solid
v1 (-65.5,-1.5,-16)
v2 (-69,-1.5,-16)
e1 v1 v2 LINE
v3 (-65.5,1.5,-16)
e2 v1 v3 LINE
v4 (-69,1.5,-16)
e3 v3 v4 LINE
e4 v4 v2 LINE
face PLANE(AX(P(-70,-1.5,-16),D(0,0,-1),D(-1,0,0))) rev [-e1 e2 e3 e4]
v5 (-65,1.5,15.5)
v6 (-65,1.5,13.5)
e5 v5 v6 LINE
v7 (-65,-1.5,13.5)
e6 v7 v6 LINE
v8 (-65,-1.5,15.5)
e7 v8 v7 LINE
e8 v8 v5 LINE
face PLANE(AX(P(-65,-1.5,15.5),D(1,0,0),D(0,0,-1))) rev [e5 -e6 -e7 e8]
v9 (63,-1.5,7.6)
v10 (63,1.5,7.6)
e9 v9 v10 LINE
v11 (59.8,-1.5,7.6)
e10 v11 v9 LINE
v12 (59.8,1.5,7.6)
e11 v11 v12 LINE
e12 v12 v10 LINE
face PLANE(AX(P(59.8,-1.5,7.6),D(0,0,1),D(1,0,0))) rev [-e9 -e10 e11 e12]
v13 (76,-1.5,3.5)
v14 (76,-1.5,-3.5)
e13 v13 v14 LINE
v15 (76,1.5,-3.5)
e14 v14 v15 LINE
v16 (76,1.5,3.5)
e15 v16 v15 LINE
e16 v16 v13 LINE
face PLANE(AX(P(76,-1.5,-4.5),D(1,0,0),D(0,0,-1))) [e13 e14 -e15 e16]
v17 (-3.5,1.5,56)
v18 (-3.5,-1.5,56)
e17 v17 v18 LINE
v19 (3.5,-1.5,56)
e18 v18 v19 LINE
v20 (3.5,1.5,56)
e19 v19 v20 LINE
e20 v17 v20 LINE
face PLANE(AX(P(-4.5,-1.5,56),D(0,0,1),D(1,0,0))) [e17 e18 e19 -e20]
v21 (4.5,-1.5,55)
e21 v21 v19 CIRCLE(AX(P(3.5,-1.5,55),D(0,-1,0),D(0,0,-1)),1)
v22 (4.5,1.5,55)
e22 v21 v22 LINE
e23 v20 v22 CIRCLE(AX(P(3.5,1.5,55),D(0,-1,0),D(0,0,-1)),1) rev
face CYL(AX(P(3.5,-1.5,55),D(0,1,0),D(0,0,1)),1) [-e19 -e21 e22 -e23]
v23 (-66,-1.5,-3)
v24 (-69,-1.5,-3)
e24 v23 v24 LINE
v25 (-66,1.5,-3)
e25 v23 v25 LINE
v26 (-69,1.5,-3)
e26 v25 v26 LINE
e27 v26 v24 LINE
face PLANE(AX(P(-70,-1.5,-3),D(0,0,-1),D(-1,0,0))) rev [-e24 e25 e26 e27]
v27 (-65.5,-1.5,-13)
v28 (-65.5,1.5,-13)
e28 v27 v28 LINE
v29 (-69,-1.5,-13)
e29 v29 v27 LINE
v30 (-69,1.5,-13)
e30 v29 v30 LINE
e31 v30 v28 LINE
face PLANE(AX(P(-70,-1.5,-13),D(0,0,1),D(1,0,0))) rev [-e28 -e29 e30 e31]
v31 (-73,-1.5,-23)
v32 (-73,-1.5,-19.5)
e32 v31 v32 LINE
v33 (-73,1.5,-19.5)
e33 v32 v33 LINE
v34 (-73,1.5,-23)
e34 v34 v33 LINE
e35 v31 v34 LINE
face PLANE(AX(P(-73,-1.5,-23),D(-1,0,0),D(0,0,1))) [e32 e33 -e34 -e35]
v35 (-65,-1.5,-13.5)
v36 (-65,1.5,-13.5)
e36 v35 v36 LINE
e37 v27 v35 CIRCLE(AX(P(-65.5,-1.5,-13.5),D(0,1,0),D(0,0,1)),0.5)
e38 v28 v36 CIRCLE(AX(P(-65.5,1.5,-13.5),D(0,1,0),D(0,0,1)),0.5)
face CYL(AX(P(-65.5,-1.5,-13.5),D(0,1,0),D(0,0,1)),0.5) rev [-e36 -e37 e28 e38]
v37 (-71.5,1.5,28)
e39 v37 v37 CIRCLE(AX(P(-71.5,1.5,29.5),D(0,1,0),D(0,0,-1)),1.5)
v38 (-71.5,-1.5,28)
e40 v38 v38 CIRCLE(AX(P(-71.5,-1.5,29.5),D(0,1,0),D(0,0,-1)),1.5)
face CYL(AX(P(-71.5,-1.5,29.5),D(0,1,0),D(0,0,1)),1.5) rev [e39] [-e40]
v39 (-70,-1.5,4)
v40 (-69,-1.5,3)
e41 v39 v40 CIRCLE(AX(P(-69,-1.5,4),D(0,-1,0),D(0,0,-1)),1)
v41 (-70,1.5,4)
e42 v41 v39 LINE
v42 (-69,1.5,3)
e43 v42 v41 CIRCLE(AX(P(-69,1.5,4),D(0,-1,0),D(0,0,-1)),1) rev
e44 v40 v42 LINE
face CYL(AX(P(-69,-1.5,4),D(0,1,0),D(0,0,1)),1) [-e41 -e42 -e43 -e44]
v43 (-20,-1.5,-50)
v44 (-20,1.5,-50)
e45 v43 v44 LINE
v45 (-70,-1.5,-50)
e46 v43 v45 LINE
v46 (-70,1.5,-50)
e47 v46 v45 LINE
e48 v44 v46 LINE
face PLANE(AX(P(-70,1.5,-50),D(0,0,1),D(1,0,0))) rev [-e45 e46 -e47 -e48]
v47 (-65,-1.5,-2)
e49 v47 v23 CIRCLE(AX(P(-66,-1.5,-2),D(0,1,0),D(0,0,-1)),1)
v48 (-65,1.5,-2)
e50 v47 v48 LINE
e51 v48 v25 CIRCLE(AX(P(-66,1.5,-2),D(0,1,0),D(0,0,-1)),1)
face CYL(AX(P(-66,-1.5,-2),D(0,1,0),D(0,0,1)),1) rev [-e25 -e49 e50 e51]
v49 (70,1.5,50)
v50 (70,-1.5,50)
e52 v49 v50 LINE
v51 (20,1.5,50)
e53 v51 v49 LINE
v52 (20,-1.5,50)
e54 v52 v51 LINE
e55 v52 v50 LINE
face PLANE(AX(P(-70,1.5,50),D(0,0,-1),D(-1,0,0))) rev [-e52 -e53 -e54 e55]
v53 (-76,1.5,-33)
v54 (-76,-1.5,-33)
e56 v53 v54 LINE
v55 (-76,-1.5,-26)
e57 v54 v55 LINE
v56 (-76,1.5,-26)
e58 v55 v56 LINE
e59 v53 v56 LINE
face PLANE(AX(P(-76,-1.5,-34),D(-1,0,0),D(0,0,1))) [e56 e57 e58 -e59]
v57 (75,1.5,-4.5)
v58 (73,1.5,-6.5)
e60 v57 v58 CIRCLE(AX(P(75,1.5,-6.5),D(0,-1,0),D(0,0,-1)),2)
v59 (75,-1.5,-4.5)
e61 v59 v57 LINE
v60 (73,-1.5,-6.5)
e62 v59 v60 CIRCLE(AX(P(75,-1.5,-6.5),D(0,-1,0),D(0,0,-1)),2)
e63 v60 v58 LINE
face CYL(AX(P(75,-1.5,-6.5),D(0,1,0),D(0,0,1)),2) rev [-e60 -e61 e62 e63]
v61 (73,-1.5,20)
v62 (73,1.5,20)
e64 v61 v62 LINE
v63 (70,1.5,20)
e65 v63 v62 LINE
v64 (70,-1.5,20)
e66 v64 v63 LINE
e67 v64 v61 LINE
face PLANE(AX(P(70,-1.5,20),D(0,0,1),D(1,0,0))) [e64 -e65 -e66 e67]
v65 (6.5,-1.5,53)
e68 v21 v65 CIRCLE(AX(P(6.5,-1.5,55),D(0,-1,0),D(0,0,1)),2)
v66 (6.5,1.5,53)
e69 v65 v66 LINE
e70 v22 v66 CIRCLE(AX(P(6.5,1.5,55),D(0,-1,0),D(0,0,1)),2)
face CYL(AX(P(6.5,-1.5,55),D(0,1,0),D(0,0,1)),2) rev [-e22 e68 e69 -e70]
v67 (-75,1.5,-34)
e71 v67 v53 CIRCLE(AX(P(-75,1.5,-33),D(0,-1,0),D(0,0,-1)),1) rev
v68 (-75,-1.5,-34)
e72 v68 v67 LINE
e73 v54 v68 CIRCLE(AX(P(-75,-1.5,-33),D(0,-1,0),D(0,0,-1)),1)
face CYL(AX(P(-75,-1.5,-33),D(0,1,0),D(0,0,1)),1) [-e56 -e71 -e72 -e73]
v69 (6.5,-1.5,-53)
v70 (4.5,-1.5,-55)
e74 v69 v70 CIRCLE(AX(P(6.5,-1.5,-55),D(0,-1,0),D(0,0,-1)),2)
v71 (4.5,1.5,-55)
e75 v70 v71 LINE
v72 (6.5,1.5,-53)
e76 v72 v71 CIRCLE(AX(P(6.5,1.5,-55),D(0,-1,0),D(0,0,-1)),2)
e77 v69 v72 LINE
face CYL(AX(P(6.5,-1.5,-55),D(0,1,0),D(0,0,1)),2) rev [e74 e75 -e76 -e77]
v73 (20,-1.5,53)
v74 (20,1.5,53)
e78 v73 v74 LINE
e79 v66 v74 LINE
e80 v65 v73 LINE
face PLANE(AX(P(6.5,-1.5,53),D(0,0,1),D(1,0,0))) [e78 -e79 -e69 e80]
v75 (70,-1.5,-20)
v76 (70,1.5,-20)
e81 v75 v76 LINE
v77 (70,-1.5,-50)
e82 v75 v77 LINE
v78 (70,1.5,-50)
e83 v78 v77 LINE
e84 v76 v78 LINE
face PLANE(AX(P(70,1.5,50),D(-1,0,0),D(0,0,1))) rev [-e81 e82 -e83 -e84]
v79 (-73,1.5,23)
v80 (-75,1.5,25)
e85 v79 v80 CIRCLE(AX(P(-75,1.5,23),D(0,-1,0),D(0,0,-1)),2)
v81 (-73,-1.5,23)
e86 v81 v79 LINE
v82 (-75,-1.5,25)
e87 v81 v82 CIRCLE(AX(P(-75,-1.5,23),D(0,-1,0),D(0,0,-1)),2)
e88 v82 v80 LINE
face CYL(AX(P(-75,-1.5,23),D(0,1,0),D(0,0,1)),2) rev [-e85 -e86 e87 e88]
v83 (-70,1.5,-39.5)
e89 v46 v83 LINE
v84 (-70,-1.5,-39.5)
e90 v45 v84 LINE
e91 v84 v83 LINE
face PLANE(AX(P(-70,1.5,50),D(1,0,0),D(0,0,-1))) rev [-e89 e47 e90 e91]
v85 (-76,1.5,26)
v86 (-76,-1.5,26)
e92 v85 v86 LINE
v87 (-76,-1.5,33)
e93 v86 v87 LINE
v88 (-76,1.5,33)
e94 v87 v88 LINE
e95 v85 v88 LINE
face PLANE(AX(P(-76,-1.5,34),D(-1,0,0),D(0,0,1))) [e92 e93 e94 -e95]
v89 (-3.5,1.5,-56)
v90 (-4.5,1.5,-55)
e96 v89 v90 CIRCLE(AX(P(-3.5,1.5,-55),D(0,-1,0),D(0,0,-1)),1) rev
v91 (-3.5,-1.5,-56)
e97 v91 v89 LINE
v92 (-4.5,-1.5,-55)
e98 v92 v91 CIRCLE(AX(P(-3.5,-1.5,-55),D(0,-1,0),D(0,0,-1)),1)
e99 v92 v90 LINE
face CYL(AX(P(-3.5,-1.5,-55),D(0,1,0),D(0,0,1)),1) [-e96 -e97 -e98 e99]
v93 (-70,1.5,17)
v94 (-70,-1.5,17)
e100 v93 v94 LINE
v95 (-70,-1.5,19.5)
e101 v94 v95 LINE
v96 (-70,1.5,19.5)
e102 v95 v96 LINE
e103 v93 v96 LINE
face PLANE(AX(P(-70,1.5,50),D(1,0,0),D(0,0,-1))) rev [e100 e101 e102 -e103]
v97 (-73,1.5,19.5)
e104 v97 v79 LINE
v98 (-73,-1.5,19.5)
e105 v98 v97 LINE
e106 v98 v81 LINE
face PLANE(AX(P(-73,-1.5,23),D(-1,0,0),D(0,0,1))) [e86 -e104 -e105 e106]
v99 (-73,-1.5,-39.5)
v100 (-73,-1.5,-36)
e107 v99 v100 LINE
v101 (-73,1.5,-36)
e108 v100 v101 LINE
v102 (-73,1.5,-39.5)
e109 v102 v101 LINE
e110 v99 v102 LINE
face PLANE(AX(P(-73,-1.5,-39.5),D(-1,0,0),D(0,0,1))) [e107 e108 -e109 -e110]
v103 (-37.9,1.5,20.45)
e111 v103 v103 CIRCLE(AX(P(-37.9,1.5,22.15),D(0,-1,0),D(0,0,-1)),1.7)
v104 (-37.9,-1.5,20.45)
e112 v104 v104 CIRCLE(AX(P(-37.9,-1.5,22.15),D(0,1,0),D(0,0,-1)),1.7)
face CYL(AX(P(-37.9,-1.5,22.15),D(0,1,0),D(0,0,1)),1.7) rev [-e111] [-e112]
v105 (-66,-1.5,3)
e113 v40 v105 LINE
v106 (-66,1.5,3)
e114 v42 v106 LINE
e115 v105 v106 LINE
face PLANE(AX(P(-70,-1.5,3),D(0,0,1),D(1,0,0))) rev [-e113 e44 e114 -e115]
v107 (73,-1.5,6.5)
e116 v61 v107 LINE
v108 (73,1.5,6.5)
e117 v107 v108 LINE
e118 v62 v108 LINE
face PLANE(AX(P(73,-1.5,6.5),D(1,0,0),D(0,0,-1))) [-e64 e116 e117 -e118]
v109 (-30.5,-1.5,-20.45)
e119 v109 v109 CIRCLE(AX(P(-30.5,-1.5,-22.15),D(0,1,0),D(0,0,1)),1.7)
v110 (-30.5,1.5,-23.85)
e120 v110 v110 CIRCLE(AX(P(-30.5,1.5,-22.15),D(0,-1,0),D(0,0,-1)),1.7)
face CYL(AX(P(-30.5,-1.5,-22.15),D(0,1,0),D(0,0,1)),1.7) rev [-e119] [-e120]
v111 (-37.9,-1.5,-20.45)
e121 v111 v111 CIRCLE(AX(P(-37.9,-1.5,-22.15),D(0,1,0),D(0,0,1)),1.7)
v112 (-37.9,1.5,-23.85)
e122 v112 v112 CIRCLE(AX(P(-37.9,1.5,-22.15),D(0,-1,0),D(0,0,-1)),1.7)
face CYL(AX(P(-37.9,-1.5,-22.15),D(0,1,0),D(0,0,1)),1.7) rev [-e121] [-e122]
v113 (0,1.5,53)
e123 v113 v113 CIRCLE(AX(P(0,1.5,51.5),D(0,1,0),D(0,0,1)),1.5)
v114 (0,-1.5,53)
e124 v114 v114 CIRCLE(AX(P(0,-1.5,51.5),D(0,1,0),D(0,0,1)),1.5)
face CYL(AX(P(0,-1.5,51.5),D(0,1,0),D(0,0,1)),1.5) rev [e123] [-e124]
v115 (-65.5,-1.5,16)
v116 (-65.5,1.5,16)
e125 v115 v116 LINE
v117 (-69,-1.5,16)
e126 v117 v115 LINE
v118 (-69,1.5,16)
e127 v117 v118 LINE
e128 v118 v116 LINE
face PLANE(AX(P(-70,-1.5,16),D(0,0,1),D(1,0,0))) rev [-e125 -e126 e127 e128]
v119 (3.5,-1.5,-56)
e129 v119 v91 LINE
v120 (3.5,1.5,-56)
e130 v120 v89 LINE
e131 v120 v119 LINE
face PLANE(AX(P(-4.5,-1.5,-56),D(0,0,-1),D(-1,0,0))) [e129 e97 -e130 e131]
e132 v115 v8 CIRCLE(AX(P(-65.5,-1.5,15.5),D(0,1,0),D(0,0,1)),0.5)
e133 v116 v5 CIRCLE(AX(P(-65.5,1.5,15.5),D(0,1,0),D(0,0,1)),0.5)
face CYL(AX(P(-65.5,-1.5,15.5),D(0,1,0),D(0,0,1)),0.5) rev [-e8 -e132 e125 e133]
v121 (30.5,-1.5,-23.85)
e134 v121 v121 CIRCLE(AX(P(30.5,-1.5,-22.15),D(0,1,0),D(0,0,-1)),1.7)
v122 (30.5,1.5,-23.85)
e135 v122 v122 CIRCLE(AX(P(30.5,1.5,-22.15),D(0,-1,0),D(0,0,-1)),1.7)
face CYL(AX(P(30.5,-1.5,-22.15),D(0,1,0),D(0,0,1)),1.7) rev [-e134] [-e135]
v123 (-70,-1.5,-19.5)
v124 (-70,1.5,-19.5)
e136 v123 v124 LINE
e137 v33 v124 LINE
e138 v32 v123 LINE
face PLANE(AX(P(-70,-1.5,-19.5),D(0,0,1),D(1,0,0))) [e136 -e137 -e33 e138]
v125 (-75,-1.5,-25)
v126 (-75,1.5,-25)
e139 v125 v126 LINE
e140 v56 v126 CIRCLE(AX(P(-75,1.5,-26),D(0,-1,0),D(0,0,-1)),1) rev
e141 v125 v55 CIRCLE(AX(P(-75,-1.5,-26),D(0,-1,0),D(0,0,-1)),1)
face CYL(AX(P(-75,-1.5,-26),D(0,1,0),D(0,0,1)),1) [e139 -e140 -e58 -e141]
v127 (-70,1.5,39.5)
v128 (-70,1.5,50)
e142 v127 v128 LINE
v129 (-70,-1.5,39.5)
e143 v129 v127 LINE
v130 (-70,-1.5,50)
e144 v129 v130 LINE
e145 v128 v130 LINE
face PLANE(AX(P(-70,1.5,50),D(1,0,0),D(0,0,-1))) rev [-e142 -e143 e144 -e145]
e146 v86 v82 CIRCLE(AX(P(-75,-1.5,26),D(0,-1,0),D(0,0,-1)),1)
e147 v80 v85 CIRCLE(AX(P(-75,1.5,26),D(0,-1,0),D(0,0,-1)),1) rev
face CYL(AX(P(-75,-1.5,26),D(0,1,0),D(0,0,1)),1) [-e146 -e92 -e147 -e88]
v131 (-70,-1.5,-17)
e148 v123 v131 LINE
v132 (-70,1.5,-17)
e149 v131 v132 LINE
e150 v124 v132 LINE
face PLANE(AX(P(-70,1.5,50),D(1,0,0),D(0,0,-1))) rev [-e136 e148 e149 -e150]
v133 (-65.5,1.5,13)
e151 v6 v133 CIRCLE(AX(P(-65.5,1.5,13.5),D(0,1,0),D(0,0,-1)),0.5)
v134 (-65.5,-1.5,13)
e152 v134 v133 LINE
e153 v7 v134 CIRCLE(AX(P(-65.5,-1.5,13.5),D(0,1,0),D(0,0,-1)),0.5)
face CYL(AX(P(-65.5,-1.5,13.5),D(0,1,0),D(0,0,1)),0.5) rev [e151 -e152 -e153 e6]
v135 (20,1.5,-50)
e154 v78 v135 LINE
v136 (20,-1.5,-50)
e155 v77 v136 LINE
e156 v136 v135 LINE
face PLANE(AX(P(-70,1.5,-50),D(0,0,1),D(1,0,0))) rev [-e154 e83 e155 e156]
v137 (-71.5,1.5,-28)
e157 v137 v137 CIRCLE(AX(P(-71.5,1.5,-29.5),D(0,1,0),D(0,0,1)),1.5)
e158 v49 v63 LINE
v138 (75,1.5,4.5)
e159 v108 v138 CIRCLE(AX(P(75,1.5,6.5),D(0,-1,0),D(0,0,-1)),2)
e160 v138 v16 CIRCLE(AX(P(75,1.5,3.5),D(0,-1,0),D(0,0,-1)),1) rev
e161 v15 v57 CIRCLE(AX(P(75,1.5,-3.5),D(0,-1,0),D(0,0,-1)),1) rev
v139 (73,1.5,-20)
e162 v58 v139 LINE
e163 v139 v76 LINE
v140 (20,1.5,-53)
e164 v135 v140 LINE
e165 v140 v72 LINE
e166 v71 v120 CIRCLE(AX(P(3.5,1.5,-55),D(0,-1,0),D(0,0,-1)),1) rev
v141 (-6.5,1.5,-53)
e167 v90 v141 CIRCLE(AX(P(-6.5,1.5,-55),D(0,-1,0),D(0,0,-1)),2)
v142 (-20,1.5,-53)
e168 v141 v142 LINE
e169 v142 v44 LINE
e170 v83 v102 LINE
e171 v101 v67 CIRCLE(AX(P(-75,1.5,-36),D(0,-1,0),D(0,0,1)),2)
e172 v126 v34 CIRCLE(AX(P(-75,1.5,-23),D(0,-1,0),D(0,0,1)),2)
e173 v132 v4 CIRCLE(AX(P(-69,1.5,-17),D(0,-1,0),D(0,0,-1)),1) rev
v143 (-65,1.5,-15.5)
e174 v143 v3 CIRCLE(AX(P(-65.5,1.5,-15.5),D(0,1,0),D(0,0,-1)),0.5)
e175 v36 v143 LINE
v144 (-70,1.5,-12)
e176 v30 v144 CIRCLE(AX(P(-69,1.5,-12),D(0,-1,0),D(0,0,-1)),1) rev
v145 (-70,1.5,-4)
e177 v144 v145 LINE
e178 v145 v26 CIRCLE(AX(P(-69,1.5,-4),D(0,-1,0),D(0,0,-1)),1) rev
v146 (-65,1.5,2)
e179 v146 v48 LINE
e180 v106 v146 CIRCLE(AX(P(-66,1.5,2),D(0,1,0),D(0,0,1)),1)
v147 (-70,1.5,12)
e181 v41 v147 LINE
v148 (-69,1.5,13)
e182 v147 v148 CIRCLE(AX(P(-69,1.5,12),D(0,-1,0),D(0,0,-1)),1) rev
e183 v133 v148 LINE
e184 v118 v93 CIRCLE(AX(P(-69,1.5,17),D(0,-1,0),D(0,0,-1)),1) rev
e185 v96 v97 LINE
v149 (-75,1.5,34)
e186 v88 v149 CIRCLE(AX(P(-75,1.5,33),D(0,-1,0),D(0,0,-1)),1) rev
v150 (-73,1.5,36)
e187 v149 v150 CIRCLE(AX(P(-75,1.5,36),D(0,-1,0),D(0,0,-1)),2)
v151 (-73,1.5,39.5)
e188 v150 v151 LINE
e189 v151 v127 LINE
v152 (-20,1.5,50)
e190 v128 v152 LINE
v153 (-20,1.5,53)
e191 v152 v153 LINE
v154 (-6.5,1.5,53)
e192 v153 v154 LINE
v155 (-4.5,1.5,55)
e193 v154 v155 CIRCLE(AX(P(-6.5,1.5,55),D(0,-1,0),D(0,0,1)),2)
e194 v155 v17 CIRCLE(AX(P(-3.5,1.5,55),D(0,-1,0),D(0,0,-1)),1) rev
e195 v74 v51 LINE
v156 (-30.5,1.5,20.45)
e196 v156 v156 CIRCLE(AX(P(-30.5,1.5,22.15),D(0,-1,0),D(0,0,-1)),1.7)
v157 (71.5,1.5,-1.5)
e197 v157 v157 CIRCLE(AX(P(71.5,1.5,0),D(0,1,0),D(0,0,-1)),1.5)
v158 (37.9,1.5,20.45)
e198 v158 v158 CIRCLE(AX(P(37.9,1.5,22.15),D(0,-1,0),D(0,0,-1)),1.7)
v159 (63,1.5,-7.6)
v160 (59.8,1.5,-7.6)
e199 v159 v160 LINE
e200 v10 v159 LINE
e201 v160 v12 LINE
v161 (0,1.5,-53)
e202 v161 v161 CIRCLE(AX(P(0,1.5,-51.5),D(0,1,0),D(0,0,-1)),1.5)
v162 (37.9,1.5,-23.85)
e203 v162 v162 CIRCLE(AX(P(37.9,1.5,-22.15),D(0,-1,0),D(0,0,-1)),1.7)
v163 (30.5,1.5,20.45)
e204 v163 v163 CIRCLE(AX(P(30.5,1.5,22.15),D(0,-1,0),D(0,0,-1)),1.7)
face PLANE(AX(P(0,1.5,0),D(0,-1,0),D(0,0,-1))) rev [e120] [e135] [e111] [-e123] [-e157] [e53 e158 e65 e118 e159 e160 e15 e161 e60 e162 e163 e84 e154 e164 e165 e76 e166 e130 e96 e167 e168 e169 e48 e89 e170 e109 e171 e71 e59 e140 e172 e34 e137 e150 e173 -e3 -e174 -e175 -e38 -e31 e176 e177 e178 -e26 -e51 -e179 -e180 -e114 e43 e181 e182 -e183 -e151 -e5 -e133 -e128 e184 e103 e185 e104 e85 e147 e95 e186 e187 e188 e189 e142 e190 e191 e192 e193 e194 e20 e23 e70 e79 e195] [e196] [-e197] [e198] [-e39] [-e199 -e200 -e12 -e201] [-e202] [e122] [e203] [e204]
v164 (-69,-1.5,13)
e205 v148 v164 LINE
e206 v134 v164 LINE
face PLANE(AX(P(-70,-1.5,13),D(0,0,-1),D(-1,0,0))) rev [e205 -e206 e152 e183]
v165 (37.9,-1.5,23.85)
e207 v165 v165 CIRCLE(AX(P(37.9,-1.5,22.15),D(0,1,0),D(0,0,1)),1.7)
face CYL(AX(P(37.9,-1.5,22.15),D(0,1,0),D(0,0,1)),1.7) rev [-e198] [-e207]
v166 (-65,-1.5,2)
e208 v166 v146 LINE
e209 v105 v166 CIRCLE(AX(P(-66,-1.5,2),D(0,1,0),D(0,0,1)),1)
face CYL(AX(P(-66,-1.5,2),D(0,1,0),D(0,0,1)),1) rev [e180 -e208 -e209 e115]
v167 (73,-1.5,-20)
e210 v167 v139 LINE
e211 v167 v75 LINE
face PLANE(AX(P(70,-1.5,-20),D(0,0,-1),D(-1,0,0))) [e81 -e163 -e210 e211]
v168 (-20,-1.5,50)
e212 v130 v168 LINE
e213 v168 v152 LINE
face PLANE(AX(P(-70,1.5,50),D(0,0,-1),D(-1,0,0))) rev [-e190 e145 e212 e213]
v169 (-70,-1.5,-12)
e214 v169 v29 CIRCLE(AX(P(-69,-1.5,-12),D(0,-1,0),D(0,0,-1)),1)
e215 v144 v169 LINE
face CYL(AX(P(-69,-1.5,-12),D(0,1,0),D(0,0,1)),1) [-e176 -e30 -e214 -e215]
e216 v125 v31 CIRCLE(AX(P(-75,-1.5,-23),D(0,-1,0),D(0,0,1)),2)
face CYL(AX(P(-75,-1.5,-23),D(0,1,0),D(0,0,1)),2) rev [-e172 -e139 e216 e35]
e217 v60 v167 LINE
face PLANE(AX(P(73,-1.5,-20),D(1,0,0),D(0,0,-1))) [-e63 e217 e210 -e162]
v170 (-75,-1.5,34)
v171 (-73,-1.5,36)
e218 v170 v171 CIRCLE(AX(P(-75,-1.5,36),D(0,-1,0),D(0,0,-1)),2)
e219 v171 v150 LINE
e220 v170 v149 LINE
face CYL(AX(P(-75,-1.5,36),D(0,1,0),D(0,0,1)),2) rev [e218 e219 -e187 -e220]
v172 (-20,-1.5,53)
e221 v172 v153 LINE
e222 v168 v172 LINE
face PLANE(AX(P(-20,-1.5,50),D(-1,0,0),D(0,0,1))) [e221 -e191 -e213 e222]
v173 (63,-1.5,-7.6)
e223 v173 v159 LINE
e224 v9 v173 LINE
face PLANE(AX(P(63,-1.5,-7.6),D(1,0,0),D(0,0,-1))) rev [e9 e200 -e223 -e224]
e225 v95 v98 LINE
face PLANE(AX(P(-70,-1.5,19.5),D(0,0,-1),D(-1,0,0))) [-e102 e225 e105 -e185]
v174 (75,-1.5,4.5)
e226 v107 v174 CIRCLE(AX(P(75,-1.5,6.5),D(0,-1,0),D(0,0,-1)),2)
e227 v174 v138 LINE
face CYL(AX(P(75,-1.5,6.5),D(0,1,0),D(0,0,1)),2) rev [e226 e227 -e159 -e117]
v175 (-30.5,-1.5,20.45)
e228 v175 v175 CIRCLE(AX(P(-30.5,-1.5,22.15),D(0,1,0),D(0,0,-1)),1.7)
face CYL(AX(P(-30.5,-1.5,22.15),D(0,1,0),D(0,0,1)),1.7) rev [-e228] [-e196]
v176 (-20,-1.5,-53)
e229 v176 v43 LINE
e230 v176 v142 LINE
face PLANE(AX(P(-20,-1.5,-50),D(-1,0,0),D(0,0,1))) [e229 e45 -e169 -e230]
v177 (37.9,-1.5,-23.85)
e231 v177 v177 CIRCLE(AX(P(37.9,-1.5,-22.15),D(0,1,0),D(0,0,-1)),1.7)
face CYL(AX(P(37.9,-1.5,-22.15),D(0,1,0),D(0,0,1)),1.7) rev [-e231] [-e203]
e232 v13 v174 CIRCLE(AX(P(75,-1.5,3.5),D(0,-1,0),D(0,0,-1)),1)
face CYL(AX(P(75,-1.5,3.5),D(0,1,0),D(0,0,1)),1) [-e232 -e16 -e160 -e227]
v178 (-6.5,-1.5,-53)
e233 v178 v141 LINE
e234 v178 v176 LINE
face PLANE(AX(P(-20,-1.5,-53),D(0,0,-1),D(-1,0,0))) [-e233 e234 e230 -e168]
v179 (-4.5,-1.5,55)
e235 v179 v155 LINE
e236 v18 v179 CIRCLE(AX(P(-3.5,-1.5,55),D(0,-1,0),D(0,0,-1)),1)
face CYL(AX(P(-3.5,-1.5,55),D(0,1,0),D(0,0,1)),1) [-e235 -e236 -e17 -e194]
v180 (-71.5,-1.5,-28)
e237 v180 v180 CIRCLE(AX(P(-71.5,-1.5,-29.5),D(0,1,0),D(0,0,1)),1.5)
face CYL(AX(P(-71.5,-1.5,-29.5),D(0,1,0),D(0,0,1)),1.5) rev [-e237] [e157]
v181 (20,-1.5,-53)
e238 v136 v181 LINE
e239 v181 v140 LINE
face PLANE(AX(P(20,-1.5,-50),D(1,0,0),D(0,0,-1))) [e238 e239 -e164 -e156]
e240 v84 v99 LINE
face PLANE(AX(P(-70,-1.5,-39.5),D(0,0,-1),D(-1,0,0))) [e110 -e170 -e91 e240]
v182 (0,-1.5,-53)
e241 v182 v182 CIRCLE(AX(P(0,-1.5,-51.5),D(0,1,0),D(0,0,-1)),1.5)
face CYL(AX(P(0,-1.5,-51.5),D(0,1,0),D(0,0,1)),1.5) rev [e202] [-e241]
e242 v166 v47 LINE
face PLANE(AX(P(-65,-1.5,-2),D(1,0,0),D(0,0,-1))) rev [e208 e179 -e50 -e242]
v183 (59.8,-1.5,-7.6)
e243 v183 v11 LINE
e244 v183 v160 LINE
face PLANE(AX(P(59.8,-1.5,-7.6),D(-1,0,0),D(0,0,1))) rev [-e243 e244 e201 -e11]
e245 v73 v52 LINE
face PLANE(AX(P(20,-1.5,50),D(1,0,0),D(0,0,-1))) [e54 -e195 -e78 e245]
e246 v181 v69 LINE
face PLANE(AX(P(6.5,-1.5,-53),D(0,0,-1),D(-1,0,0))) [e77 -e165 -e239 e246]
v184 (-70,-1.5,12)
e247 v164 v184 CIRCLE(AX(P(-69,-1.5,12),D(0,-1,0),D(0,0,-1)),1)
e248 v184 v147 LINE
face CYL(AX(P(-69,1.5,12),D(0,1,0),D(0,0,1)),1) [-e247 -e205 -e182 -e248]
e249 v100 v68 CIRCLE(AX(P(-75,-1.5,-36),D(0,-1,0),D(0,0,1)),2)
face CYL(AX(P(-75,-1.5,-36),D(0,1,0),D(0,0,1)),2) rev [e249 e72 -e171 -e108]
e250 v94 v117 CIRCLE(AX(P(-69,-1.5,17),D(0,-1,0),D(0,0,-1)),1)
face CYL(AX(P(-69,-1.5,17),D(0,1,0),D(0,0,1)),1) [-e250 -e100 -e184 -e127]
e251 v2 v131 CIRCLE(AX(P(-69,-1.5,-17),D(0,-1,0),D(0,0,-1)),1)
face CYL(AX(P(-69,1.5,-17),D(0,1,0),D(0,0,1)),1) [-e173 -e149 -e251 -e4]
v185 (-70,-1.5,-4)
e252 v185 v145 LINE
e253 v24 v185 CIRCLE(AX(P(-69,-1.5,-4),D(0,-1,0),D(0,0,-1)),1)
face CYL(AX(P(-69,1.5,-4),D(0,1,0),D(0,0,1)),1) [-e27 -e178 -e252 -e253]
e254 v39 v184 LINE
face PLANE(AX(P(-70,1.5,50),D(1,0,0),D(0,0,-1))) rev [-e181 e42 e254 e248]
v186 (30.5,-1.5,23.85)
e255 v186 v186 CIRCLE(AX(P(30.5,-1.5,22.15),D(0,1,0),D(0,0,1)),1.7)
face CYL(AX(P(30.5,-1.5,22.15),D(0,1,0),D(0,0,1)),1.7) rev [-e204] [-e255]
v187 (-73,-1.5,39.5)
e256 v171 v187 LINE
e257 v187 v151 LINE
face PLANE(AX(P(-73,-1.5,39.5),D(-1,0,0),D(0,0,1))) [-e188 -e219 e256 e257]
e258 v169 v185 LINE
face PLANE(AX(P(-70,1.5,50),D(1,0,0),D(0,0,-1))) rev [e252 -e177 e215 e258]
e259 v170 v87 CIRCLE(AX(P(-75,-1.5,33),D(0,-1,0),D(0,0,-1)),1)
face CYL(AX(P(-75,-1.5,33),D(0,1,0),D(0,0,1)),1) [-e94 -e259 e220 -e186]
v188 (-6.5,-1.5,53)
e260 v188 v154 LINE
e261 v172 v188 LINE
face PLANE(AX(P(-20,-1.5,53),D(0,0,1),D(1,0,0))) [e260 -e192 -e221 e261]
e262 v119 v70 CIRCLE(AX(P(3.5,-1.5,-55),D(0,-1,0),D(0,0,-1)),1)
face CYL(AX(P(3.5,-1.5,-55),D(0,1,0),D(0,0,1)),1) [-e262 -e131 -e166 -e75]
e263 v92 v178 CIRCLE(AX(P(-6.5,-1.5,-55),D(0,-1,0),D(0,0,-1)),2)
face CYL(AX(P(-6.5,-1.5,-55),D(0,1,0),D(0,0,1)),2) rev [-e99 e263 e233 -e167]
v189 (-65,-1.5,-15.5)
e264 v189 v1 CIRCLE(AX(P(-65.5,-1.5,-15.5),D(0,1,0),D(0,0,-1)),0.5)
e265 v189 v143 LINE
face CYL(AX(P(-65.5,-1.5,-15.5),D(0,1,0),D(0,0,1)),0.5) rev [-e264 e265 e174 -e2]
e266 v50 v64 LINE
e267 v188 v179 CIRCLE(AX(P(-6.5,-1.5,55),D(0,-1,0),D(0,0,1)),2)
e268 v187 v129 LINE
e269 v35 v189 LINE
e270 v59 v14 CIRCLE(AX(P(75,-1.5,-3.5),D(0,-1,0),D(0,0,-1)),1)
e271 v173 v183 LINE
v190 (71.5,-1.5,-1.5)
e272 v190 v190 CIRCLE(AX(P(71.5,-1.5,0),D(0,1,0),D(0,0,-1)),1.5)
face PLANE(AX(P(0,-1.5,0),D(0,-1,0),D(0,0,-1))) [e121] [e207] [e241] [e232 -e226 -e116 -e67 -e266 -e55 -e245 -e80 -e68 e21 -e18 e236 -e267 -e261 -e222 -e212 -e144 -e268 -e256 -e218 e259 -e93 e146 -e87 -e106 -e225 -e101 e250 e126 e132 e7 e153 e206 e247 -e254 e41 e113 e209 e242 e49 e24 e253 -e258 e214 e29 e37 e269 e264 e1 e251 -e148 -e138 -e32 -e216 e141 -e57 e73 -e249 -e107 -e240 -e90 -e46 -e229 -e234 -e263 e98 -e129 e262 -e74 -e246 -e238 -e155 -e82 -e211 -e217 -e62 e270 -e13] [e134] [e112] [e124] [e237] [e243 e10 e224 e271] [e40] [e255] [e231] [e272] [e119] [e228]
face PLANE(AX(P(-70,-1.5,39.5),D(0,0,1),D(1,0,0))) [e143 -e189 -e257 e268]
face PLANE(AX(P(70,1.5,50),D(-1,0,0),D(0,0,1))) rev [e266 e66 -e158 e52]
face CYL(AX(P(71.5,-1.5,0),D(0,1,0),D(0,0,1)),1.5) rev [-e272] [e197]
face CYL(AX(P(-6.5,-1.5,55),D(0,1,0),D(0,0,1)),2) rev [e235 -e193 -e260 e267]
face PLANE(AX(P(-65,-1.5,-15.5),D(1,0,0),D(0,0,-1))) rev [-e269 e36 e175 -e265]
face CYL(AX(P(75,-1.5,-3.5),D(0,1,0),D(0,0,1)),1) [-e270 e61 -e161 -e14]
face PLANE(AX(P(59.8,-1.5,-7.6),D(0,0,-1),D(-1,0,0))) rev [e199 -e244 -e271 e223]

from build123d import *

# Parameters (mm, degrees)
ESBO_O1_W                = 140
ESBO_O1_H                = 100
RESSALTO_EXTRUS_O1_DEPTH = 1.5
RESSALTO_EXTRUS_O2_DEPTH = 3
ESBO_O2_R                = 1.5
CORTE_EXTRUS_O1_DEPTH    = 95.451045521
CUT_EXTRUDE1_DEPTH       = 95.451045521
CUT_EXTRUDE1_DEPTH_BACK  = 95.451045521
SKETCH1_R                = 1.7
CUT_EXTRUDE4_DEPTH       = 95.415305963
CUT_EXTRUDE4_DEPTH_BACK  = 95.415305963
FILLET1_R                = 1
CUT_EXTRUDE3_DEPTH       = 95.415305963
CUT_EXTRUDE3_DEPTH_BACK  = 95.415305963
SKETCH2_W                = 3.2
SKETCH2_H                = 15.2


with BuildPart() as part:
    # Esboço1 → Ressalto-extrusão1 (new, symmetric)
    with BuildSketch(Plane(origin=(0, 0, 0), x_dir=(1, 0, 0), z_dir=(0, 1, 0))):
        Rectangle(ESBO_O1_W, ESBO_O1_H)
    extrude(amount=RESSALTO_EXTRUS_O1_DEPTH, both=True)

    # Esboço4 → Ressalto-extrusão2 (add, through all)
    with BuildSketch(Plane(origin=(0, 1.5, 0), x_dir=(1, 0, 0), z_dir=(0, 1, 0))):
        with BuildLine():
            Line((6.5, 53), (20, 53))
            Line((20, 53), (20, 50))
            Line((20, 50), (-20, 50))
            Line((-20, 50), (-20, 53))
            Line((-20, 53), (-6.5, 53))
            ThreePointArc((-6.5, 53), (-5.085786438, 53.585786438), (-4.5, 55))
            Line((-4.5, 55), (-4.5, 56))
            Line((-4.5, 56), (4.5, 56))
            Line((4.5, 56), (4.5, 55))
            ThreePointArc((4.5, 55), (5.085786438, 53.585786438), (6.5, 53))
        make_face()
        with BuildLine():
            Line((4.5, -56), (4.5, -55))
            ThreePointArc((4.5, -55), (5.085786438, -53.585786438), (6.5, -53))
            Line((6.5, -53), (20, -53))
            Line((20, -53), (20, -50))
            Line((20, -50), (-20, -50))
            Line((-20, -50), (-20, -53))
            Line((-20, -53), (-6.5, -53))
            ThreePointArc((-6.5, -53), (-5.085786438, -53.585786438), (-4.5, -55))
            Line((-4.5, -55), (-4.5, -56))
            Line((-4.5, -56), (4.5, -56))
        make_face()
        with BuildLine():
            Line((70, 20), (73, 20))
            Line((73, 20), (73, 6.5))
            ThreePointArc((73, 6.5), (73.585786438, 5.085786438), (75, 4.5))
            Line((75, 4.5), (76, 4.5))
            Line((76, 4.5), (76, -4.5))
            Line((76, -4.5), (75, -4.5))
            ThreePointArc((75, -4.5), (73.585786438, -5.085786438), (73, -6.5))
            Line((73, -6.5), (73, -20))
            Line((73, -20), (70, -20))
            Line((70, -20), (70, 20))
        make_face()
        with BuildLine():
            Line((-70, 39.5), (-73, 39.5))
            Line((-73, 39.5), (-73, 36))
            ThreePointArc((-73, 36), (-73.585786438, 34.585786438), (-75, 34))
            Line((-75, 34), (-76, 34))
            Line((-76, 34), (-76, 25))
            Line((-76, 25), (-75, 25))
            ThreePointArc((-75, 25), (-73.585786438, 24.414213562), (-73, 23))
            Line((-73, 23), (-73, 19.5))
            Line((-73, 19.5), (-70, 19.5))
            Line((-70, 19.5), (-70, 39.5))
        make_face()
        with BuildLine():
            Line((-76, -34), (-76, -25))
            Line((-76, -25), (-75, -25))
            ThreePointArc((-75, -25), (-73.585786438, -24.414213562), (-73, -23))
            Line((-73, -23), (-73, -19.5))
            Line((-73, -19.5), (-70, -19.5))
            Line((-70, -19.5), (-70, -39.5))
            Line((-70, -39.5), (-73, -39.5))
            Line((-73, -39.5), (-73, -36))
            ThreePointArc((-73, -36), (-73.585786438, -34.585786438), (-75, -34))
            Line((-75, -34), (-76, -34))
        make_face()
    extrude(amount=-RESSALTO_EXTRUS_O2_DEPTH)

    # Esboço2 → Corte-extrusão1 (cut, through all)
    with BuildSketch(Plane(origin=(0, 1.5, 0), x_dir=(1, 0, 0), z_dir=(0, 1, 0))):
        with Locations(Location((0, -51.5, 0), (0, 0, 270))):
            Circle(ESBO_O2_R)
        with Locations(Location((0, 51.5, 0), (0, 0, 90))):
            Circle(ESBO_O2_R)
        with Locations(Location((71.5, 0, 0), (0, 0, 90))):
            Circle(ESBO_O2_R)
        with Locations(Location((-71.5, 29.5, 0), (0, 0, 270))):
            Circle(ESBO_O2_R)
        with Locations(Location((-71.5, -29.5, 0), (0, 0, 90))):
            Circle(ESBO_O2_R)
    extrude(amount=-CORTE_EXTRUS_O1_DEPTH, mode=Mode.SUBTRACT)

    # Sketch1 → Cut-Extrude1 (cut, two sides: drawn at the far end of the back side and taken through both)
    with BuildSketch(Plane(origin=(0, 1.5, 0), x_dir=(1, 0, 0), z_dir=(0, 1, 0)).offset(-CUT_EXTRUDE1_DEPTH_BACK)):
        with Locations(Location((30.5, -22.15, 0), (0, 0, 270))):
            Circle(SKETCH1_R)
        with Locations(Location((37.9, -22.15, 0), (0, 0, 270))):
            Circle(SKETCH1_R)
        with Locations(Location((37.9, 22.15, 0), (0, 0, 90))):
            Circle(SKETCH1_R)
        with Locations(Location((30.5, 22.15, 0), (0, 0, 90))):
            Circle(SKETCH1_R)
        with Locations(Location((-30.5, 22.15, 0), (0, 0, 270))):
            Circle(SKETCH1_R)
        with Locations(Location((-37.9, 22.15, 0), (0, 0, 270))):
            Circle(SKETCH1_R)
        with Locations(Location((-37.9, -22.15, 0), (0, 0, 90))):
            Circle(SKETCH1_R)
        with Locations(Location((-30.5, -22.15, 0), (0, 0, 90))):
            Circle(SKETCH1_R)
    extrude(amount=CUT_EXTRUDE1_DEPTH + CUT_EXTRUDE1_DEPTH_BACK, mode=Mode.SUBTRACT)

    # Sketch3 → Cut-Extrude4 (cut, two sides: drawn at the far end of the back side and taken through both)
    with BuildSketch(Plane(origin=(0, 0, 0), x_dir=(1, 0, 0), z_dir=(0, 1, 0)).offset(-CUT_EXTRUDE4_DEPTH_BACK)):
        with BuildLine():
            Line((-70, 3), (-66, 3))
            ThreePointArc((-66, 3), (-65.292893219, 2.707106781), (-65, 2))
            Line((-65, 2), (-65, -2))
            ThreePointArc((-65, -2), (-65.292893219, -2.707106781), (-66, -3))
            Line((-66, -3), (-70, -3))
            Line((-70, -3), (-70, 3))
        make_face()
        with BuildLine():
            Line((-70, 16), (-65.5, 16))
            ThreePointArc((-65.5, 16), (-65.146446609, 15.853553391), (-65, 15.5))
            Line((-65, 15.5), (-65, 13.5))
            ThreePointArc((-65, 13.5), (-65.146446609, 13.146446609), (-65.5, 13))
            Line((-65.5, 13), (-70, 13))
            Line((-70, 13), (-70, 16))
        make_face()
        with BuildLine():
            Line((-65, -15.5), (-65, -13.5))
            ThreePointArc((-65, -13.5), (-65.146446609, -13.146446609), (-65.5, -13))
            Line((-65.5, -13), (-70, -13))
            Line((-70, -13), (-70, -16))
            Line((-70, -16), (-65.5, -16))
            ThreePointArc((-65.5, -16), (-65.146446609, -15.853553391), (-65, -15.5))
        make_face()
    extrude(amount=CUT_EXTRUDE4_DEPTH + CUT_EXTRUDE4_DEPTH_BACK, mode=Mode.SUBTRACT)

    # Fillet1
    fillet1_edges = [part.edges().sort_by_distance(p)[0] for p in [
        (-4.5, 0, -56),
        (4.5, 0, -56),
        (4.5, 0, 56),
        (-4.5, 0, 56),
        (76, 0, 4.5),
        (76, 0, -4.5),
        (-76, 0, 25),
        (-76, 0, 34),
        (-76, 0, -25),
        (-76, 0, -34),
        (-70, 0, 3),
        (-70, 0, -3),
        (-70, 0, -16),
        (-70, 0, -13),
        (-70, 0, 16),
        (-70, 0, 13),
    ]]
    fillet(fillet1_edges, radius=FILLET1_R - 0.0001)  # a hair under: the kernel refuses the full size

    # Sketch2 → Cut-Extrude3 (cut, two sides: drawn at the far end of the back side and taken through both)
    with BuildSketch(Plane(origin=(0, 0, 0), x_dir=(1, 0, 0), z_dir=(0, 1, 0)).offset(-CUT_EXTRUDE3_DEPTH_BACK)):
        with Locations((61.4, 0)):
            Rectangle(SKETCH2_W, SKETCH2_H)
    extrude(amount=CUT_EXTRUDE3_DEPTH + CUT_EXTRUDE3_DEPTH_BACK, mode=Mode.SUBTRACT)


solid = part.part
